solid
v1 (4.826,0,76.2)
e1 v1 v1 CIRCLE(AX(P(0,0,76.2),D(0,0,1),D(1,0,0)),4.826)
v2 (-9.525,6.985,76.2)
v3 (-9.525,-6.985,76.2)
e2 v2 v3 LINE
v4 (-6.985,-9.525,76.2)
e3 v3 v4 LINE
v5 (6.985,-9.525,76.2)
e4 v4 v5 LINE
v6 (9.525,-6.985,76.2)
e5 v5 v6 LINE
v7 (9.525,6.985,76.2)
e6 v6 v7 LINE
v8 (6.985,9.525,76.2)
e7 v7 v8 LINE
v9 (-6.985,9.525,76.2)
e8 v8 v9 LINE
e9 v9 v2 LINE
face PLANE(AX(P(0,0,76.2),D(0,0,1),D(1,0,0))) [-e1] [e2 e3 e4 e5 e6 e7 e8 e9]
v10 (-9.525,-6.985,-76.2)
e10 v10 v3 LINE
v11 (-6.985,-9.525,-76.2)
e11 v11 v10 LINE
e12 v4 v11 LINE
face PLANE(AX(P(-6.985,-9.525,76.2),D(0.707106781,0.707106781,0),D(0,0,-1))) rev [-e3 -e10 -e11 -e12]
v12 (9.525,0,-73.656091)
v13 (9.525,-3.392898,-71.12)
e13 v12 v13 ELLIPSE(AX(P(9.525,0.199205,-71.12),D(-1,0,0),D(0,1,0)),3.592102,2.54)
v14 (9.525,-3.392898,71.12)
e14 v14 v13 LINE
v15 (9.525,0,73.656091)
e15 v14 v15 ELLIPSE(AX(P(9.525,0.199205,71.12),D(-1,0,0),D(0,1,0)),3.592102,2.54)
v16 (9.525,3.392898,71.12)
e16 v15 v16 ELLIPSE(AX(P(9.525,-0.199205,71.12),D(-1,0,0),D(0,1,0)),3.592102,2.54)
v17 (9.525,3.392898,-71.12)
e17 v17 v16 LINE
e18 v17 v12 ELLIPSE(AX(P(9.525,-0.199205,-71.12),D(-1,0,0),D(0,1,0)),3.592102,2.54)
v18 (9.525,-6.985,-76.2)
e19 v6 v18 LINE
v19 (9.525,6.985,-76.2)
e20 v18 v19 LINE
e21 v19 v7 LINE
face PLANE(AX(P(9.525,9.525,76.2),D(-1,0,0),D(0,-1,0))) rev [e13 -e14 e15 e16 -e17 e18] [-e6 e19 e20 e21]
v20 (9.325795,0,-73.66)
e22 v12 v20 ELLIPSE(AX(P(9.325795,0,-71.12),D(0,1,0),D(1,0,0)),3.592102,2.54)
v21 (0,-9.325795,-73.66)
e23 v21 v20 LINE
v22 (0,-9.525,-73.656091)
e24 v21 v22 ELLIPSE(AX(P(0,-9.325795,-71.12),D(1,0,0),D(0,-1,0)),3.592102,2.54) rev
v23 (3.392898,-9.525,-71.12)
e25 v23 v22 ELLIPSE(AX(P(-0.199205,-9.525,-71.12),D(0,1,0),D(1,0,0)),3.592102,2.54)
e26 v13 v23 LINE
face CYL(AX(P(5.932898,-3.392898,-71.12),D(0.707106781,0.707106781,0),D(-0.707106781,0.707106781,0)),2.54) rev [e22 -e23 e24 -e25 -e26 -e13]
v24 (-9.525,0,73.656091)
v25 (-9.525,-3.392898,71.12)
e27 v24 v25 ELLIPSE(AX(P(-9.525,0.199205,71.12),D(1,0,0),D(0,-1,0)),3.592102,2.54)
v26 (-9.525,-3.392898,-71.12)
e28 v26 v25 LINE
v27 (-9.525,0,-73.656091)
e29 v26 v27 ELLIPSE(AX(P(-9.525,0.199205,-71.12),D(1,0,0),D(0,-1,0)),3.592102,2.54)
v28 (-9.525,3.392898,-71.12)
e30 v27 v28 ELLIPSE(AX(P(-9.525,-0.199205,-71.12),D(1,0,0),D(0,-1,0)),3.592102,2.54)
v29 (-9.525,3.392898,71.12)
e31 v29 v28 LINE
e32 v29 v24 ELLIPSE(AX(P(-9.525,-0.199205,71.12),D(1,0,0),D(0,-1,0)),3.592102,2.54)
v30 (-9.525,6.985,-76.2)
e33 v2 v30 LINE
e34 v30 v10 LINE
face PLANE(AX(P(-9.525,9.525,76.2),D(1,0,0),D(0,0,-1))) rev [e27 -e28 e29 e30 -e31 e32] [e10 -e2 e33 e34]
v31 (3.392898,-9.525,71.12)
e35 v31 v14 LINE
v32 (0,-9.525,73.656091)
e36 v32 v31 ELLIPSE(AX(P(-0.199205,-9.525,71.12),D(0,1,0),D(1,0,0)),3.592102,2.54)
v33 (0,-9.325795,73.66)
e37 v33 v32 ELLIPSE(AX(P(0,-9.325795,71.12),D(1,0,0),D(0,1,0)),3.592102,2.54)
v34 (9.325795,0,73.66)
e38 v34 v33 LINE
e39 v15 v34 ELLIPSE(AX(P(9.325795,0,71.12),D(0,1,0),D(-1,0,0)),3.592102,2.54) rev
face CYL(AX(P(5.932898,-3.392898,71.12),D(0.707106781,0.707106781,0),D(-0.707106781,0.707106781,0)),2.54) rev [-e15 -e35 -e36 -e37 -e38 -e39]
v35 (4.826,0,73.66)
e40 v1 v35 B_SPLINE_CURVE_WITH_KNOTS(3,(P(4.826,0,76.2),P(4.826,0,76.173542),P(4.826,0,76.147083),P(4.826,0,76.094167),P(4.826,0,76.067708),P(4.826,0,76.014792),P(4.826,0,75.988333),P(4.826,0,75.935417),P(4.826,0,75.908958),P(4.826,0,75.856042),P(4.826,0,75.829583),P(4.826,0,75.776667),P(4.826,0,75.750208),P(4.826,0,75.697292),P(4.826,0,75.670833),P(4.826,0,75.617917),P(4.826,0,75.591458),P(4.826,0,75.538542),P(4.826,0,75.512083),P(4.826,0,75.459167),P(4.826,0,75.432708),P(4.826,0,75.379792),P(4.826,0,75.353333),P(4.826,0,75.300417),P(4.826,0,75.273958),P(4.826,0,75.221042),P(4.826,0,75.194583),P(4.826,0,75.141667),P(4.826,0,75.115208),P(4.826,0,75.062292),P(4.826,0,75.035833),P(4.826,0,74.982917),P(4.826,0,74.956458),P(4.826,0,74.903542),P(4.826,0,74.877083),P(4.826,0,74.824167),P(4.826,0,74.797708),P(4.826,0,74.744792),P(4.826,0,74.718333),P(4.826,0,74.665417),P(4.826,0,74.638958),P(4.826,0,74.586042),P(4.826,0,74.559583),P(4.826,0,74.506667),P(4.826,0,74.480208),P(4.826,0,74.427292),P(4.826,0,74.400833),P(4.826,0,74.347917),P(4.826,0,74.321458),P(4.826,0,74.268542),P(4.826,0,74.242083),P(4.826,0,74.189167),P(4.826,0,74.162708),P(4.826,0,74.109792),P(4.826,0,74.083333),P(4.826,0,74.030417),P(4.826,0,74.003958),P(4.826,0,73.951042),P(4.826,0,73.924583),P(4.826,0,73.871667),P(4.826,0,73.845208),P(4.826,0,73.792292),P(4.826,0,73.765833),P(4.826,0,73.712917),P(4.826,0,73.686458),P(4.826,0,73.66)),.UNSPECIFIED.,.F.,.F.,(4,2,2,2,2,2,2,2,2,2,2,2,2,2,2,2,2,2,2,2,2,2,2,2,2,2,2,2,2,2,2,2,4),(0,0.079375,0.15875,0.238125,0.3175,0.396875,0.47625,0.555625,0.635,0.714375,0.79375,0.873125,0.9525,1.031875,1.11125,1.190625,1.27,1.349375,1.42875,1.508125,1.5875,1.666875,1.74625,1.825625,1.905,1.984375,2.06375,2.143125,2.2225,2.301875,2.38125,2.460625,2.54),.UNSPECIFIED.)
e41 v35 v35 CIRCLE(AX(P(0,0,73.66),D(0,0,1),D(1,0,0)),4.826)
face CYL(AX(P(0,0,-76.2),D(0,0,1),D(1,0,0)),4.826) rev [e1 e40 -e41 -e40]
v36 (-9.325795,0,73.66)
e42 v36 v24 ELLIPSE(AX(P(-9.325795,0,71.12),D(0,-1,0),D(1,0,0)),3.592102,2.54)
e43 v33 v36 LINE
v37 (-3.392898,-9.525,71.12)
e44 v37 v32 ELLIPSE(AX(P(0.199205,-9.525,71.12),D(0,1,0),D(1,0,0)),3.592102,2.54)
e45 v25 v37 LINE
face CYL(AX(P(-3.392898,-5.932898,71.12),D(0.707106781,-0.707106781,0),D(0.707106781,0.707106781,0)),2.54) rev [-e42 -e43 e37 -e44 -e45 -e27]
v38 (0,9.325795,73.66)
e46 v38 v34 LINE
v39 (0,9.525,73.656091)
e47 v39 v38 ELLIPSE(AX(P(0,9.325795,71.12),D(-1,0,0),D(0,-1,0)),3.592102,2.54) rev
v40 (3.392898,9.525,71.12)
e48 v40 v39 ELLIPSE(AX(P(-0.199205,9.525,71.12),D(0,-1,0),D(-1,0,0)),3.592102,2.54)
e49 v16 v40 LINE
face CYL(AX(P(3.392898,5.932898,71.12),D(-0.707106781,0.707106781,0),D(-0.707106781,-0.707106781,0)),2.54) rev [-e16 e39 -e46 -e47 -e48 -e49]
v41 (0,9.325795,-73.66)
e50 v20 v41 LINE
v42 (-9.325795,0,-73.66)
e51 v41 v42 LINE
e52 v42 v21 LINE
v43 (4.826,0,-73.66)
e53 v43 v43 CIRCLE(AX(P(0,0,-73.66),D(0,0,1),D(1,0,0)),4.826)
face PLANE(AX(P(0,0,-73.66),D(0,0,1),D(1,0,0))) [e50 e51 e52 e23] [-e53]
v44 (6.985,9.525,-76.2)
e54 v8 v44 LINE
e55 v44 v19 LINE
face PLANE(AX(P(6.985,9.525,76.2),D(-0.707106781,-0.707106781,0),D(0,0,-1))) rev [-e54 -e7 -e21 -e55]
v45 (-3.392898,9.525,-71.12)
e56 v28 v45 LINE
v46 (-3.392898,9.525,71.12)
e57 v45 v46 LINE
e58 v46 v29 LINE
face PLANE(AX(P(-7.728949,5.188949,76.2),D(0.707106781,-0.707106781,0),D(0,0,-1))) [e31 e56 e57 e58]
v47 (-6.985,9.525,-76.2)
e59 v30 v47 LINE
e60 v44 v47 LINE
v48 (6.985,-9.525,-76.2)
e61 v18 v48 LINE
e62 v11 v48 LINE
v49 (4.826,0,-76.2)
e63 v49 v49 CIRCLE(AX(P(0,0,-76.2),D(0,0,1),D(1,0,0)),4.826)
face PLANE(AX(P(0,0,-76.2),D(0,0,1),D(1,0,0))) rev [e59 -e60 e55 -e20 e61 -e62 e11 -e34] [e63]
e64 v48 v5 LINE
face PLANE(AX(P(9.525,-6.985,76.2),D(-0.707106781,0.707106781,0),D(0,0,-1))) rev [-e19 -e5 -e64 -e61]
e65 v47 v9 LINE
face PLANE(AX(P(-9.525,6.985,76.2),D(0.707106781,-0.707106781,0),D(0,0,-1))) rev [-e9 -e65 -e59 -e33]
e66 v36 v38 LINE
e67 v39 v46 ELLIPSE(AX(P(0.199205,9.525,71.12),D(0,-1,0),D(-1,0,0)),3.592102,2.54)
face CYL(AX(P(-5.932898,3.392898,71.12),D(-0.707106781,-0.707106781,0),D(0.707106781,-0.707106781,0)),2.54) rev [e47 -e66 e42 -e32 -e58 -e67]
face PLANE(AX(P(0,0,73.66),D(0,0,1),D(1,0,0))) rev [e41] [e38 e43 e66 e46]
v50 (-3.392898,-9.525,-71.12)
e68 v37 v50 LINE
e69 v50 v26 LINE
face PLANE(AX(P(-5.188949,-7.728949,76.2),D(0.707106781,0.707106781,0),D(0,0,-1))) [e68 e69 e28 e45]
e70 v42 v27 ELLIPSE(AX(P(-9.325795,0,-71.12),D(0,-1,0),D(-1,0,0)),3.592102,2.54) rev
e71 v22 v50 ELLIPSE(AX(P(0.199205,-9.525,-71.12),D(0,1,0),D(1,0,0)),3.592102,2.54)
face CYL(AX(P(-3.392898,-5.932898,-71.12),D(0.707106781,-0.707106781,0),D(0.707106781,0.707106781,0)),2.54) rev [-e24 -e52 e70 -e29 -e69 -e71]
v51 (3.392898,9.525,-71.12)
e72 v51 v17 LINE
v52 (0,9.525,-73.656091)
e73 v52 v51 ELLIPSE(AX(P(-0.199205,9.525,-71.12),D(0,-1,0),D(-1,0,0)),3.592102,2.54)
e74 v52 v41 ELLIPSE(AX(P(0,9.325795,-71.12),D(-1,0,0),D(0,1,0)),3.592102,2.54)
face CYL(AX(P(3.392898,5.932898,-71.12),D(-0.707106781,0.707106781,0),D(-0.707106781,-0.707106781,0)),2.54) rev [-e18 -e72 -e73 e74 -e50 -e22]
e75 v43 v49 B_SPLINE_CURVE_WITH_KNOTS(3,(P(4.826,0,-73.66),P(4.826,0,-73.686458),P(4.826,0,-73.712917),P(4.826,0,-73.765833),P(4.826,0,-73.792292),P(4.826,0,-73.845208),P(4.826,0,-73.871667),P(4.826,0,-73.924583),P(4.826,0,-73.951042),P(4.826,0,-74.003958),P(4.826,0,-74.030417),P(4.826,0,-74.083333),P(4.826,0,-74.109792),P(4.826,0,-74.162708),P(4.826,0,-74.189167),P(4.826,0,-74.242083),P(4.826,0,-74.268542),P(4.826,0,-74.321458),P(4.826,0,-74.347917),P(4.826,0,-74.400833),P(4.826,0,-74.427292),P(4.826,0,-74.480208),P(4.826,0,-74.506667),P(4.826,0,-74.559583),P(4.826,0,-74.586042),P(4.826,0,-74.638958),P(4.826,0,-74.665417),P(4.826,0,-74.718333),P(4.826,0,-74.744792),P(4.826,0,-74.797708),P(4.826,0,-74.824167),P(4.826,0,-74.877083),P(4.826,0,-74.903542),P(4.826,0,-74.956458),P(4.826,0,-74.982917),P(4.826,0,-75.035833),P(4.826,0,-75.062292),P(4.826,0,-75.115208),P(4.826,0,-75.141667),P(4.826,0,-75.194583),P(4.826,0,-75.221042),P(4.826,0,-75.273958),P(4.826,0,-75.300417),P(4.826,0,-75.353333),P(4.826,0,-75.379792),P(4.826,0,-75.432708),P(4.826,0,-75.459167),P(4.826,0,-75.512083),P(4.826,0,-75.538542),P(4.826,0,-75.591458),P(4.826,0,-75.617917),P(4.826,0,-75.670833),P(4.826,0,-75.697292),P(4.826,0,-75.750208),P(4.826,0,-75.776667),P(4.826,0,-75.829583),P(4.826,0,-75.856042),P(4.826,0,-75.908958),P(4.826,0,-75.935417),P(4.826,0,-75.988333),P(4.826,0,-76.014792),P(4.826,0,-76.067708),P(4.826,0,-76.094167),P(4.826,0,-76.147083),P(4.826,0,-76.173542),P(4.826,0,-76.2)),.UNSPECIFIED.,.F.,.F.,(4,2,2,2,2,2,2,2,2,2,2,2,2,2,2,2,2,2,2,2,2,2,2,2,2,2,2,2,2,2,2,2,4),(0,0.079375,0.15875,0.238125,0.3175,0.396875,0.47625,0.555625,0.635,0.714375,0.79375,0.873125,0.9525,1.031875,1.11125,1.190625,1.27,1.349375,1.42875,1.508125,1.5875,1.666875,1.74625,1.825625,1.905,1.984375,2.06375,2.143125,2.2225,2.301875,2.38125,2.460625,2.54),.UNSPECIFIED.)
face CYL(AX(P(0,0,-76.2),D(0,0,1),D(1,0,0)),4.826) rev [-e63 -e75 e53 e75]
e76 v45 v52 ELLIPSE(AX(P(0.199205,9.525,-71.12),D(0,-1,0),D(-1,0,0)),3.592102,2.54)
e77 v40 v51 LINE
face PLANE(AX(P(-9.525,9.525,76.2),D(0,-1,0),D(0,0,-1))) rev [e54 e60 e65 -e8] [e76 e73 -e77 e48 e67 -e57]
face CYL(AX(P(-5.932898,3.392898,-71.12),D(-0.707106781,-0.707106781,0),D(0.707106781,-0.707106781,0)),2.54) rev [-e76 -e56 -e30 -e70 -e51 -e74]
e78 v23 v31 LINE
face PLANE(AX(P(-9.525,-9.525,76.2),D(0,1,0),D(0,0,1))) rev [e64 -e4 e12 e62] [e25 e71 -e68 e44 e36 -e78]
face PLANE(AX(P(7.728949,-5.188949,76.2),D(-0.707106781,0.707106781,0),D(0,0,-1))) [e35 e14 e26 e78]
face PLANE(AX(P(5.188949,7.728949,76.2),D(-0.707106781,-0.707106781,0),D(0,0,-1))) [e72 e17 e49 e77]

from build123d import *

# Parameters (mm, degrees)
SKETCH1_W           = 19.05
SKETCH1_H           = 19.05
BOSS_EXTRUDE1_DEPTH = 76.2
CHAMFER1_SIZE       = 2.54
SHELL1_T            = -2.54
FILLET1_R           = 2.54
SKETCH3_R           = 4.826
CUT_EXTRUDE1_DEPTH  = 153.9941543


with BuildPart() as part:
    # Sketch1 → Boss-Extrude1 (new, symmetric)
    with BuildSketch(Plane.XY):
        Rectangle(SKETCH1_W, SKETCH1_H)
    extrude(amount=BOSS_EXTRUDE1_DEPTH, both=True)

    # Chamfer1
    chamfer1_edges = [part.edges().sort_by_distance(p)[0] for p in [
        (9.525, -9.525, 0),
        (-9.525, -9.525, 0),
        (-9.525, 9.525, 0),
        (9.525, 9.525, 0),
    ]]
    chamfer(chamfer1_edges, length=CHAMFER1_SIZE)

    # Shell1
    shell1_openings = [part.faces().sort_by_distance(p)[0] for p in [
        (0, -9.525, 0),
        (-9.525, 0, 0),
        (0, 9.525, 0),
        (9.525, 0, 0),
    ]]
    offset(amount=SHELL1_T, openings=shell1_openings, kind=Kind.INTERSECTION)

    # Fillet1
    # the kernel refuses this fillet: 2.54 mm, written as the material it adds along each edge
    with BuildSketch(Plane(origin=(1.097230509, 14.015128061, -73.66), x_dir=(0.7071067811865476, -0.7071067811865476, 0), z_dir=(-0.7071067811865476, -0.7071067811865476, 0))) as fillet1_piece_1_section:
        with BuildLine():
            CenterArc((FILLET1_R, FILLET1_R), FILLET1_R, 180, 90)
            Line((0, FILLET1_R), (0, 0))
            Line((0, 0), (FILLET1_R, 0))
        make_face()
    fillet1_piece_1 = extrude(amount=21.372102448, mode=Mode.PRIVATE)
    fillet1_piece_1 = split(fillet1_piece_1, bisect_by=Plane(origin=(-9.525, 6.009158894, -73.121025702), z_dir=(1, 0, 0)), keep=Keep.TOP, mode=Mode.PRIVATE)
    fillet1_piece_1 = split(fillet1_piece_1, bisect_by=Plane(origin=(-6.009158894, 9.525, -73.121025702), z_dir=(0, -1, 0)), keep=Keep.TOP, mode=Mode.PRIVATE)
    add(fillet1_piece_1)
    with BuildSketch(Plane(origin=(14.015128061, 1.097230509, -73.66), x_dir=(-0.7071067811865476, 0.7071067811865476, 0), z_dir=(-0.7071067811865476, -0.7071067811865476, 0))) as fillet1_piece_2_section:
        with BuildLine():
            CenterArc((FILLET1_R, -FILLET1_R), FILLET1_R, 90, 90)
            Line((0, -FILLET1_R), (0, 0))
            Line((0, 0), (FILLET1_R, 0))
        make_face()
    fillet1_piece_2 = extrude(amount=21.372102448, mode=Mode.PRIVATE)
    fillet1_piece_2 = split(fillet1_piece_2, bisect_by=Plane(origin=(6.009158894, -9.525, -73.121025702), z_dir=(0, 1, 0)), keep=Keep.TOP, mode=Mode.PRIVATE)
    fillet1_piece_2 = split(fillet1_piece_2, bisect_by=Plane(origin=(9.525, -6.009158894, -73.121025702), z_dir=(-1, 0, 0)), keep=Keep.TOP, mode=Mode.PRIVATE)
    add(fillet1_piece_2)
    with BuildSketch(Plane(origin=(14.015128061, -1.097230509, -73.66), x_dir=(-0.7071067811865476, -0.7071067811865476, 0), z_dir=(-0.7071067811865476, 0.7071067811865476, 0))) as fillet1_piece_3_section:
        with BuildLine():
            CenterArc((FILLET1_R, FILLET1_R), FILLET1_R, 180, 90)
            Line((0, FILLET1_R), (0, 0))
            Line((0, 0), (FILLET1_R, 0))
        make_face()
    fillet1_piece_3 = extrude(amount=21.372102448, mode=Mode.PRIVATE)
    fillet1_piece_3 = split(fillet1_piece_3, bisect_by=Plane(origin=(9.525, 6.009158894, -73.121025702), z_dir=(-1, 0, 0)), keep=Keep.TOP, mode=Mode.PRIVATE)
    fillet1_piece_3 = split(fillet1_piece_3, bisect_by=Plane(origin=(6.009158894, 9.525, -73.121025702), z_dir=(0, -1, 0)), keep=Keep.TOP, mode=Mode.PRIVATE)
    add(fillet1_piece_3)
    with BuildSketch(Plane(origin=(1.097230509, -14.015128061, -73.66), x_dir=(0.7071067811865476, 0.7071067811865476, 0), z_dir=(-0.7071067811865476, 0.7071067811865476, 0))) as fillet1_piece_4_section:
        with BuildLine():
            CenterArc((FILLET1_R, -FILLET1_R), FILLET1_R, 90, 90)
            Line((0, -FILLET1_R), (0, 0))
            Line((0, 0), (FILLET1_R, 0))
        make_face()
    fillet1_piece_4 = extrude(amount=21.372102448, mode=Mode.PRIVATE)
    fillet1_piece_4 = split(fillet1_piece_4, bisect_by=Plane(origin=(-9.525, -6.009158894, -73.121025702), z_dir=(1, 0, 0)), keep=Keep.TOP, mode=Mode.PRIVATE)
    fillet1_piece_4 = split(fillet1_piece_4, bisect_by=Plane(origin=(-6.009158894, -9.525, -73.121025702), z_dir=(0, 1, 0)), keep=Keep.TOP, mode=Mode.PRIVATE)
    add(fillet1_piece_4)
    with BuildSketch(Plane(origin=(-14.015128061, -1.097230509, 73.66), x_dir=(0, 0, -1), z_dir=(0.7071067811865476, 0.7071067811865476, 0))) as fillet1_piece_5_section:
        with BuildLine():
            CenterArc((FILLET1_R, -FILLET1_R), FILLET1_R, 90, 90)
            Line((0, -FILLET1_R), (0, 0))
            Line((0, 0), (FILLET1_R, 0))
        make_face()
    fillet1_piece_5 = extrude(amount=21.372102448, mode=Mode.PRIVATE)
    fillet1_piece_5 = split(fillet1_piece_5, bisect_by=Plane(origin=(-9.525, 6.009158894, 73.121025702), z_dir=(1, 0, 0)), keep=Keep.TOP, mode=Mode.PRIVATE)
    fillet1_piece_5 = split(fillet1_piece_5, bisect_by=Plane(origin=(-6.009158894, 9.525, 73.121025702), z_dir=(0, -1, 0)), keep=Keep.TOP, mode=Mode.PRIVATE)
    add(fillet1_piece_5)
    with BuildSketch(Plane(origin=(-1.097230509, 14.015128061, 73.66), x_dir=(0, 0, -1), z_dir=(0.7071067811865476, -0.7071067811865476, 0))) as fillet1_piece_6_section:
        with BuildLine():
            CenterArc((FILLET1_R, -FILLET1_R), FILLET1_R, 90, 90)
            Line((0, -FILLET1_R), (0, 0))
            Line((0, 0), (FILLET1_R, 0))
        make_face()
    fillet1_piece_6 = extrude(amount=21.372102448, mode=Mode.PRIVATE)
    fillet1_piece_6 = split(fillet1_piece_6, bisect_by=Plane(origin=(9.525, 6.009158894, 73.121025702), z_dir=(-1, 0, 0)), keep=Keep.TOP, mode=Mode.PRIVATE)
    fillet1_piece_6 = split(fillet1_piece_6, bisect_by=Plane(origin=(6.009158894, 9.525, 73.121025702), z_dir=(0, -1, 0)), keep=Keep.TOP, mode=Mode.PRIVATE)
    add(fillet1_piece_6)
    with BuildSketch(Plane(origin=(14.015128061, 1.097230509, 73.66), x_dir=(-0.7071067811865476, 0.7071067811865476, 0), z_dir=(-0.7071067811865476, -0.7071067811865476, 0))) as fillet1_piece_7_section:
        with BuildLine():
            CenterArc((FILLET1_R, FILLET1_R), FILLET1_R, 180, 90)
            Line((0, FILLET1_R), (0, 0))
            Line((0, 0), (FILLET1_R, 0))
        make_face()
    fillet1_piece_7 = extrude(amount=21.372102448, mode=Mode.PRIVATE)
    fillet1_piece_7 = split(fillet1_piece_7, bisect_by=Plane(origin=(6.009158894, -9.525, 73.121025702), z_dir=(0, 1, 0)), keep=Keep.TOP, mode=Mode.PRIVATE)
    fillet1_piece_7 = split(fillet1_piece_7, bisect_by=Plane(origin=(9.525, -6.009158894, 73.121025702), z_dir=(-1, 0, 0)), keep=Keep.TOP, mode=Mode.PRIVATE)
    add(fillet1_piece_7)
    with BuildSketch(Plane(origin=(1.097230509, -14.015128061, 73.66), x_dir=(0.7071067811865476, 0.7071067811865476, 0), z_dir=(-0.7071067811865476, 0.7071067811865476, 0))) as fillet1_piece_8_section:
        with BuildLine():
            CenterArc((FILLET1_R, FILLET1_R), FILLET1_R, 180, 90)
            Line((0, FILLET1_R), (0, 0))
            Line((0, 0), (FILLET1_R, 0))
        make_face()
    fillet1_piece_8 = extrude(amount=21.372102448, mode=Mode.PRIVATE)
    fillet1_piece_8 = split(fillet1_piece_8, bisect_by=Plane(origin=(-9.525, -6.009158894, 73.121025702), z_dir=(1, 0, 0)), keep=Keep.TOP, mode=Mode.PRIVATE)
    fillet1_piece_8 = split(fillet1_piece_8, bisect_by=Plane(origin=(-6.009158894, -9.525, 73.121025702), z_dir=(0, 1, 0)), keep=Keep.TOP, mode=Mode.PRIVATE)
    add(fillet1_piece_8)

    # Sketch3 → Cut-Extrude1 (cut, through all)
    with BuildSketch(Plane.XY.offset(76.2)):
        Circle(SKETCH3_R)
    extrude(amount=-CUT_EXTRUDE1_DEPTH, mode=Mode.SUBTRACT)


solid = part.part
